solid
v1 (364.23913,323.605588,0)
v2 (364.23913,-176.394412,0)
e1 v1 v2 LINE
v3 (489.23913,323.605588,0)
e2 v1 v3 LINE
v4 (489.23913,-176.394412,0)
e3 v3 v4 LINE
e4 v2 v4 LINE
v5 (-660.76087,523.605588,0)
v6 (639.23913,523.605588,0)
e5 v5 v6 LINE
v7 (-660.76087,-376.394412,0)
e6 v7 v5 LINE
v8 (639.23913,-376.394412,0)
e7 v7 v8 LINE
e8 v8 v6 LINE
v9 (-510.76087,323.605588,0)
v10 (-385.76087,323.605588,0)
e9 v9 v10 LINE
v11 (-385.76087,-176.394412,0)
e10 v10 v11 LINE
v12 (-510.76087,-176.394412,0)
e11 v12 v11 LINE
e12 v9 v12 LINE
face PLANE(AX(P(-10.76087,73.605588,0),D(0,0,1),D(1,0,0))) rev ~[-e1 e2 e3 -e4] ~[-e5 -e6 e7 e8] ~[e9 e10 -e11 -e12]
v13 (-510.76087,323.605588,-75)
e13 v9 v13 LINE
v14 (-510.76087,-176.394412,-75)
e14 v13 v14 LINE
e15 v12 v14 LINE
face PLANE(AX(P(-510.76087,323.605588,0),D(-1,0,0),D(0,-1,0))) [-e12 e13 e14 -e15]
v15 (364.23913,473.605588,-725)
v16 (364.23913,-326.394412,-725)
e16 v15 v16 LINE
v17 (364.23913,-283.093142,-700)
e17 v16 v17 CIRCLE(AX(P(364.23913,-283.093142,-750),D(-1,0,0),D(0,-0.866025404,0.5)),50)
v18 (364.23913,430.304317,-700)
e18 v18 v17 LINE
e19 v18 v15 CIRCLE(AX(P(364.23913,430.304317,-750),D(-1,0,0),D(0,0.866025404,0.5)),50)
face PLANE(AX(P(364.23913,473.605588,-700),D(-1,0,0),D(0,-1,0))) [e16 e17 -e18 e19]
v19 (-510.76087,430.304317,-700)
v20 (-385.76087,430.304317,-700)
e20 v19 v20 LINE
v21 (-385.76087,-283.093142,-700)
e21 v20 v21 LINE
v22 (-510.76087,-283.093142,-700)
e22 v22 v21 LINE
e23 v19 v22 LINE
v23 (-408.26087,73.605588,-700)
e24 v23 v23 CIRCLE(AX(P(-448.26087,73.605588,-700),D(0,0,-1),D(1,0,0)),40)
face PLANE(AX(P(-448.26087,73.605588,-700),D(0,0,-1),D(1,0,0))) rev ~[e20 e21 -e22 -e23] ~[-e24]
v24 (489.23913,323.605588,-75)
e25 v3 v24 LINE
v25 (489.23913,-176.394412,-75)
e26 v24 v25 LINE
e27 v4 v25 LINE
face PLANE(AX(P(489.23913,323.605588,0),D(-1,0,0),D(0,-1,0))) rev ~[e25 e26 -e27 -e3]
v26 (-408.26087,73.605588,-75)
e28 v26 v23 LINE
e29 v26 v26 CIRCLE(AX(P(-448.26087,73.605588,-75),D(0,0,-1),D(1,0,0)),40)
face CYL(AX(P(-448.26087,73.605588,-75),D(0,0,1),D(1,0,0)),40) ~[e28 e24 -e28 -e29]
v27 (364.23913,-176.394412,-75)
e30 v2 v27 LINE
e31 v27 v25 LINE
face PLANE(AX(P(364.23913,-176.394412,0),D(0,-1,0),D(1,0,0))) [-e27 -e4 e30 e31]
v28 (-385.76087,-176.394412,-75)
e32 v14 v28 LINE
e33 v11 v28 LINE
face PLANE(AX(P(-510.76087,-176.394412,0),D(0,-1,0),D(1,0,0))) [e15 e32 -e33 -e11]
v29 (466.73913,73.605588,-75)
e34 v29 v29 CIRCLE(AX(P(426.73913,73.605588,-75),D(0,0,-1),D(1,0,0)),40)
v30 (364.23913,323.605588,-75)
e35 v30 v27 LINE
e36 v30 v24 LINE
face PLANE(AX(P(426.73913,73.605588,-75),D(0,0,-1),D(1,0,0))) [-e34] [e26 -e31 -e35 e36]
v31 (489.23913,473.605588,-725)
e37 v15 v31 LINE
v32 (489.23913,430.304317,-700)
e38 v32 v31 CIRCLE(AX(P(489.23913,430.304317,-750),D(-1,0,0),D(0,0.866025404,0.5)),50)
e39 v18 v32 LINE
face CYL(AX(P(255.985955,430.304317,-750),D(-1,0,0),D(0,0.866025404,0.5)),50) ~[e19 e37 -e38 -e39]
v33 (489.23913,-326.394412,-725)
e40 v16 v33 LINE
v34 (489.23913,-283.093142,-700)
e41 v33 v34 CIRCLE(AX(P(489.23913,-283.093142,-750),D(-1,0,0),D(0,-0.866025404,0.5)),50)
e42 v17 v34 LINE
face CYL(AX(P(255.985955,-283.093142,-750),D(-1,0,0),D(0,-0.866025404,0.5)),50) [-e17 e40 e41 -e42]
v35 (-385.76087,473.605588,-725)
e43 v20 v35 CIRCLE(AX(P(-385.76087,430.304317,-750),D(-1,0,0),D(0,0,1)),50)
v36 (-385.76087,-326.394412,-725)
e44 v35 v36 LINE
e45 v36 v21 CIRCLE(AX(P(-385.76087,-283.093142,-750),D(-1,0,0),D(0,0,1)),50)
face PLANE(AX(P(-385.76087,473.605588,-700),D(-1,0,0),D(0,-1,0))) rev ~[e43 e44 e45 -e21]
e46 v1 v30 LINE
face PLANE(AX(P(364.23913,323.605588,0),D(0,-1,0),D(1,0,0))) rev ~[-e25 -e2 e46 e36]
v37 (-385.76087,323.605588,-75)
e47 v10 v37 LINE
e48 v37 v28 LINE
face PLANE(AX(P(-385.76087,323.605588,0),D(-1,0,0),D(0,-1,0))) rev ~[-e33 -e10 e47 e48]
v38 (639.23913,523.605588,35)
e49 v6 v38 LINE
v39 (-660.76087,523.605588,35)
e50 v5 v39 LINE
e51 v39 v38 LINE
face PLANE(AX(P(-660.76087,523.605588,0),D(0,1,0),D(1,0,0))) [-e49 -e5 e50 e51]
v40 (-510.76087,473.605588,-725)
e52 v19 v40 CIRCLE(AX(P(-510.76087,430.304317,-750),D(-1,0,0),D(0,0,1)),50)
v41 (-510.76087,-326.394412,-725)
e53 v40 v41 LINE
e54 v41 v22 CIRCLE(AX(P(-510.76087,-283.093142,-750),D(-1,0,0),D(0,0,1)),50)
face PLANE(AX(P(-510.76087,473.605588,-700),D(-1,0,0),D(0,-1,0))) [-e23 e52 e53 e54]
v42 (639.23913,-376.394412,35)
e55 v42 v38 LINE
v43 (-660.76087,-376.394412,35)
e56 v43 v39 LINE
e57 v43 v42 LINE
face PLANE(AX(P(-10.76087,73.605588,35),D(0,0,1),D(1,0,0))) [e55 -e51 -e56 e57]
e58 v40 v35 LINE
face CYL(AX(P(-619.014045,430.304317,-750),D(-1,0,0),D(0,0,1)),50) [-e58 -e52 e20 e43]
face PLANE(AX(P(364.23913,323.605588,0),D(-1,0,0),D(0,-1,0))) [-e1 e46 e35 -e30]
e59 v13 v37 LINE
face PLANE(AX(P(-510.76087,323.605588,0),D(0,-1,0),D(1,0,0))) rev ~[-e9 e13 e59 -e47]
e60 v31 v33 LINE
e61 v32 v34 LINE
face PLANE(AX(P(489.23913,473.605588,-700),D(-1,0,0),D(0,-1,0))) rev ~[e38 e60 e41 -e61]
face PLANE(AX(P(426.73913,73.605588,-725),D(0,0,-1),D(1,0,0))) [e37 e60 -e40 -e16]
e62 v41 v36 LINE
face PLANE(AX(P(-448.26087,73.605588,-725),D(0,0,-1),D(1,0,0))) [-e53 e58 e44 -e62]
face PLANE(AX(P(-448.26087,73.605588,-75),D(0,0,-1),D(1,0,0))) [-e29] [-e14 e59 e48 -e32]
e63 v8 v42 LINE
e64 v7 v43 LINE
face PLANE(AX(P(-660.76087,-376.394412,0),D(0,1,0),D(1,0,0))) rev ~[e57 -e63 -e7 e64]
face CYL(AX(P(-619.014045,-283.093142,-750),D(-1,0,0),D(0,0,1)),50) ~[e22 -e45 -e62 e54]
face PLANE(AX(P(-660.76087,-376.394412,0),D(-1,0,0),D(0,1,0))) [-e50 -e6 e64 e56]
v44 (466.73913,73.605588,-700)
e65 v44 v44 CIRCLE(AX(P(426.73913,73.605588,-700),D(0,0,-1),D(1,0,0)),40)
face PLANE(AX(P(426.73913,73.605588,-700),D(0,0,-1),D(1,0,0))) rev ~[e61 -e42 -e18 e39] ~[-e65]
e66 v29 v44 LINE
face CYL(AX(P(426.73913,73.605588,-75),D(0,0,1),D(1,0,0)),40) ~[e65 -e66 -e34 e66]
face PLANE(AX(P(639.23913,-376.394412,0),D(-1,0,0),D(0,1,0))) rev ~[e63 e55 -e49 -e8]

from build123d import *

# Parameters (mm, degrees)
F0_W        = 1300
F0_H        = 900
F1_DEPTH    = 35
F2_W        = 125
F2_H        = 500
F3_DEPTH    = 75
F4_R        = 40
F5_R        = 40
F6_DEPTH    = 625
F7_W        = 125
F7_H        = 800
F7_R        = 40
F8_DEPTH    = 25
F9_T1_DEPTH = 341.5063509461
F9_T3_DEPTH = 341.5063509461


# Not quite as in the source:
# - a fillet or chamfer that OpenCascade refuses, or shapes differently, is made with other operations: its cross-section is extruded or revolved along the edge and cut away or added


with BuildPart() as f1:
    # F0 (on Top) → F1 (new body)
    with BuildSketch(Plane.XY):
        with Locations((-10.7608698308, 73.6055876629)):
            Rectangle(F0_W, F0_H)
    extrude(amount=F1_DEPTH)

    # F2 (on face) → F3 (join)
    with BuildSketch(Plane(origin=(0, 0, 0), x_dir=(1, 0, 0), z_dir=(0, 0, -1))):
        with Locations((-448.2608698308, -73.6055876629)):
            Rectangle(F2_W, F2_H)
        with Locations((426.7391301692, -73.6055876629)):
            Rectangle(F2_W, F2_H)
    extrude(amount=F3_DEPTH)

    # F4 (on face) + F5 (on face) → F6 (join)
    with BuildSketch(Plane(origin=(0, 0, -75), x_dir=(1, 0, 0), z_dir=(0, 0, -1))):
        with Locations((-448.2608698308, -73.6055876629)):
            Circle(F4_R)
    with BuildSketch(Plane(origin=(0, 0, -75), x_dir=(1, 0, 0), z_dir=(0, 0, -1))):
        with Locations((426.7391301692, -73.6055876629)):
            Circle(F5_R)
    extrude(amount=F6_DEPTH)

    # F7 (on face) → F8 (join)
    with BuildSketch(Plane(origin=(0, 0, -700), x_dir=(1, 0, 0), z_dir=(0, 0, -1))):
        with Locations((-448.2608698308, -73.6055876629)):
            Rectangle(F7_W, F7_H)
        with Locations((-448.2608698308, -73.6055876629)):
            Circle(F7_R, mode=Mode.SUBTRACT)
        with Locations((426.7391301692, -73.6055876629)):
            Rectangle(F7_W, F7_H)
        with Locations((-448.2608698308, -73.6055876629)):
            Circle(F7_R)
    extrude(amount=F8_DEPTH)

    # F9: fillet of radius 50 on 4 edges, made by hand

    # F9_s2 → F9_t1 (cut)
    with BuildSketch(Plane.YZ.offset(-619.0140453039)):
        with BuildLine():
            ThreePointArc((-283.0931421479, -700), (-308.0931421479, -706.6987298108), (-326.3944123371, -725))
            Line((-326.3944123371, -725), (-326.3944123371, -700))
            Line((-326.3944123371, -700), (-283.0931421479, -700))
        make_face()
        with BuildLine():
            ThreePointArc((430.3043174737, -700), (455.3043174737, -706.6987298108), (473.6055876629, -725))
            Line((473.6055876629, -725), (473.6055876629, -700))
            Line((473.6055876629, -700), (430.3043174737, -700))
        make_face()
    extrude(amount=F9_T1_DEPTH, mode=Mode.SUBTRACT)

    # F9_s4 → F9_t3 (cut)
    with BuildSketch(Plane.YZ.offset(255.9859546961)):
        with BuildLine():
            ThreePointArc((-326.3944123371, -725), (-308.0931421479, -706.6987298108), (-283.0931421479, -700))
            Line((-283.0931421479, -700), (-326.3944123371, -700))
            Line((-326.3944123371, -700), (-326.3944123371, -725))
        make_face()
        with BuildLine():
            ThreePointArc((473.6055876629, -725), (455.3043174737, -706.6987298108), (430.3043174737, -700))
            Line((430.3043174737, -700), (473.6055876629, -700))
            Line((473.6055876629, -700), (473.6055876629, -725))
        make_face()
    extrude(amount=F9_T3_DEPTH, mode=Mode.SUBTRACT)


solid = f1.part
